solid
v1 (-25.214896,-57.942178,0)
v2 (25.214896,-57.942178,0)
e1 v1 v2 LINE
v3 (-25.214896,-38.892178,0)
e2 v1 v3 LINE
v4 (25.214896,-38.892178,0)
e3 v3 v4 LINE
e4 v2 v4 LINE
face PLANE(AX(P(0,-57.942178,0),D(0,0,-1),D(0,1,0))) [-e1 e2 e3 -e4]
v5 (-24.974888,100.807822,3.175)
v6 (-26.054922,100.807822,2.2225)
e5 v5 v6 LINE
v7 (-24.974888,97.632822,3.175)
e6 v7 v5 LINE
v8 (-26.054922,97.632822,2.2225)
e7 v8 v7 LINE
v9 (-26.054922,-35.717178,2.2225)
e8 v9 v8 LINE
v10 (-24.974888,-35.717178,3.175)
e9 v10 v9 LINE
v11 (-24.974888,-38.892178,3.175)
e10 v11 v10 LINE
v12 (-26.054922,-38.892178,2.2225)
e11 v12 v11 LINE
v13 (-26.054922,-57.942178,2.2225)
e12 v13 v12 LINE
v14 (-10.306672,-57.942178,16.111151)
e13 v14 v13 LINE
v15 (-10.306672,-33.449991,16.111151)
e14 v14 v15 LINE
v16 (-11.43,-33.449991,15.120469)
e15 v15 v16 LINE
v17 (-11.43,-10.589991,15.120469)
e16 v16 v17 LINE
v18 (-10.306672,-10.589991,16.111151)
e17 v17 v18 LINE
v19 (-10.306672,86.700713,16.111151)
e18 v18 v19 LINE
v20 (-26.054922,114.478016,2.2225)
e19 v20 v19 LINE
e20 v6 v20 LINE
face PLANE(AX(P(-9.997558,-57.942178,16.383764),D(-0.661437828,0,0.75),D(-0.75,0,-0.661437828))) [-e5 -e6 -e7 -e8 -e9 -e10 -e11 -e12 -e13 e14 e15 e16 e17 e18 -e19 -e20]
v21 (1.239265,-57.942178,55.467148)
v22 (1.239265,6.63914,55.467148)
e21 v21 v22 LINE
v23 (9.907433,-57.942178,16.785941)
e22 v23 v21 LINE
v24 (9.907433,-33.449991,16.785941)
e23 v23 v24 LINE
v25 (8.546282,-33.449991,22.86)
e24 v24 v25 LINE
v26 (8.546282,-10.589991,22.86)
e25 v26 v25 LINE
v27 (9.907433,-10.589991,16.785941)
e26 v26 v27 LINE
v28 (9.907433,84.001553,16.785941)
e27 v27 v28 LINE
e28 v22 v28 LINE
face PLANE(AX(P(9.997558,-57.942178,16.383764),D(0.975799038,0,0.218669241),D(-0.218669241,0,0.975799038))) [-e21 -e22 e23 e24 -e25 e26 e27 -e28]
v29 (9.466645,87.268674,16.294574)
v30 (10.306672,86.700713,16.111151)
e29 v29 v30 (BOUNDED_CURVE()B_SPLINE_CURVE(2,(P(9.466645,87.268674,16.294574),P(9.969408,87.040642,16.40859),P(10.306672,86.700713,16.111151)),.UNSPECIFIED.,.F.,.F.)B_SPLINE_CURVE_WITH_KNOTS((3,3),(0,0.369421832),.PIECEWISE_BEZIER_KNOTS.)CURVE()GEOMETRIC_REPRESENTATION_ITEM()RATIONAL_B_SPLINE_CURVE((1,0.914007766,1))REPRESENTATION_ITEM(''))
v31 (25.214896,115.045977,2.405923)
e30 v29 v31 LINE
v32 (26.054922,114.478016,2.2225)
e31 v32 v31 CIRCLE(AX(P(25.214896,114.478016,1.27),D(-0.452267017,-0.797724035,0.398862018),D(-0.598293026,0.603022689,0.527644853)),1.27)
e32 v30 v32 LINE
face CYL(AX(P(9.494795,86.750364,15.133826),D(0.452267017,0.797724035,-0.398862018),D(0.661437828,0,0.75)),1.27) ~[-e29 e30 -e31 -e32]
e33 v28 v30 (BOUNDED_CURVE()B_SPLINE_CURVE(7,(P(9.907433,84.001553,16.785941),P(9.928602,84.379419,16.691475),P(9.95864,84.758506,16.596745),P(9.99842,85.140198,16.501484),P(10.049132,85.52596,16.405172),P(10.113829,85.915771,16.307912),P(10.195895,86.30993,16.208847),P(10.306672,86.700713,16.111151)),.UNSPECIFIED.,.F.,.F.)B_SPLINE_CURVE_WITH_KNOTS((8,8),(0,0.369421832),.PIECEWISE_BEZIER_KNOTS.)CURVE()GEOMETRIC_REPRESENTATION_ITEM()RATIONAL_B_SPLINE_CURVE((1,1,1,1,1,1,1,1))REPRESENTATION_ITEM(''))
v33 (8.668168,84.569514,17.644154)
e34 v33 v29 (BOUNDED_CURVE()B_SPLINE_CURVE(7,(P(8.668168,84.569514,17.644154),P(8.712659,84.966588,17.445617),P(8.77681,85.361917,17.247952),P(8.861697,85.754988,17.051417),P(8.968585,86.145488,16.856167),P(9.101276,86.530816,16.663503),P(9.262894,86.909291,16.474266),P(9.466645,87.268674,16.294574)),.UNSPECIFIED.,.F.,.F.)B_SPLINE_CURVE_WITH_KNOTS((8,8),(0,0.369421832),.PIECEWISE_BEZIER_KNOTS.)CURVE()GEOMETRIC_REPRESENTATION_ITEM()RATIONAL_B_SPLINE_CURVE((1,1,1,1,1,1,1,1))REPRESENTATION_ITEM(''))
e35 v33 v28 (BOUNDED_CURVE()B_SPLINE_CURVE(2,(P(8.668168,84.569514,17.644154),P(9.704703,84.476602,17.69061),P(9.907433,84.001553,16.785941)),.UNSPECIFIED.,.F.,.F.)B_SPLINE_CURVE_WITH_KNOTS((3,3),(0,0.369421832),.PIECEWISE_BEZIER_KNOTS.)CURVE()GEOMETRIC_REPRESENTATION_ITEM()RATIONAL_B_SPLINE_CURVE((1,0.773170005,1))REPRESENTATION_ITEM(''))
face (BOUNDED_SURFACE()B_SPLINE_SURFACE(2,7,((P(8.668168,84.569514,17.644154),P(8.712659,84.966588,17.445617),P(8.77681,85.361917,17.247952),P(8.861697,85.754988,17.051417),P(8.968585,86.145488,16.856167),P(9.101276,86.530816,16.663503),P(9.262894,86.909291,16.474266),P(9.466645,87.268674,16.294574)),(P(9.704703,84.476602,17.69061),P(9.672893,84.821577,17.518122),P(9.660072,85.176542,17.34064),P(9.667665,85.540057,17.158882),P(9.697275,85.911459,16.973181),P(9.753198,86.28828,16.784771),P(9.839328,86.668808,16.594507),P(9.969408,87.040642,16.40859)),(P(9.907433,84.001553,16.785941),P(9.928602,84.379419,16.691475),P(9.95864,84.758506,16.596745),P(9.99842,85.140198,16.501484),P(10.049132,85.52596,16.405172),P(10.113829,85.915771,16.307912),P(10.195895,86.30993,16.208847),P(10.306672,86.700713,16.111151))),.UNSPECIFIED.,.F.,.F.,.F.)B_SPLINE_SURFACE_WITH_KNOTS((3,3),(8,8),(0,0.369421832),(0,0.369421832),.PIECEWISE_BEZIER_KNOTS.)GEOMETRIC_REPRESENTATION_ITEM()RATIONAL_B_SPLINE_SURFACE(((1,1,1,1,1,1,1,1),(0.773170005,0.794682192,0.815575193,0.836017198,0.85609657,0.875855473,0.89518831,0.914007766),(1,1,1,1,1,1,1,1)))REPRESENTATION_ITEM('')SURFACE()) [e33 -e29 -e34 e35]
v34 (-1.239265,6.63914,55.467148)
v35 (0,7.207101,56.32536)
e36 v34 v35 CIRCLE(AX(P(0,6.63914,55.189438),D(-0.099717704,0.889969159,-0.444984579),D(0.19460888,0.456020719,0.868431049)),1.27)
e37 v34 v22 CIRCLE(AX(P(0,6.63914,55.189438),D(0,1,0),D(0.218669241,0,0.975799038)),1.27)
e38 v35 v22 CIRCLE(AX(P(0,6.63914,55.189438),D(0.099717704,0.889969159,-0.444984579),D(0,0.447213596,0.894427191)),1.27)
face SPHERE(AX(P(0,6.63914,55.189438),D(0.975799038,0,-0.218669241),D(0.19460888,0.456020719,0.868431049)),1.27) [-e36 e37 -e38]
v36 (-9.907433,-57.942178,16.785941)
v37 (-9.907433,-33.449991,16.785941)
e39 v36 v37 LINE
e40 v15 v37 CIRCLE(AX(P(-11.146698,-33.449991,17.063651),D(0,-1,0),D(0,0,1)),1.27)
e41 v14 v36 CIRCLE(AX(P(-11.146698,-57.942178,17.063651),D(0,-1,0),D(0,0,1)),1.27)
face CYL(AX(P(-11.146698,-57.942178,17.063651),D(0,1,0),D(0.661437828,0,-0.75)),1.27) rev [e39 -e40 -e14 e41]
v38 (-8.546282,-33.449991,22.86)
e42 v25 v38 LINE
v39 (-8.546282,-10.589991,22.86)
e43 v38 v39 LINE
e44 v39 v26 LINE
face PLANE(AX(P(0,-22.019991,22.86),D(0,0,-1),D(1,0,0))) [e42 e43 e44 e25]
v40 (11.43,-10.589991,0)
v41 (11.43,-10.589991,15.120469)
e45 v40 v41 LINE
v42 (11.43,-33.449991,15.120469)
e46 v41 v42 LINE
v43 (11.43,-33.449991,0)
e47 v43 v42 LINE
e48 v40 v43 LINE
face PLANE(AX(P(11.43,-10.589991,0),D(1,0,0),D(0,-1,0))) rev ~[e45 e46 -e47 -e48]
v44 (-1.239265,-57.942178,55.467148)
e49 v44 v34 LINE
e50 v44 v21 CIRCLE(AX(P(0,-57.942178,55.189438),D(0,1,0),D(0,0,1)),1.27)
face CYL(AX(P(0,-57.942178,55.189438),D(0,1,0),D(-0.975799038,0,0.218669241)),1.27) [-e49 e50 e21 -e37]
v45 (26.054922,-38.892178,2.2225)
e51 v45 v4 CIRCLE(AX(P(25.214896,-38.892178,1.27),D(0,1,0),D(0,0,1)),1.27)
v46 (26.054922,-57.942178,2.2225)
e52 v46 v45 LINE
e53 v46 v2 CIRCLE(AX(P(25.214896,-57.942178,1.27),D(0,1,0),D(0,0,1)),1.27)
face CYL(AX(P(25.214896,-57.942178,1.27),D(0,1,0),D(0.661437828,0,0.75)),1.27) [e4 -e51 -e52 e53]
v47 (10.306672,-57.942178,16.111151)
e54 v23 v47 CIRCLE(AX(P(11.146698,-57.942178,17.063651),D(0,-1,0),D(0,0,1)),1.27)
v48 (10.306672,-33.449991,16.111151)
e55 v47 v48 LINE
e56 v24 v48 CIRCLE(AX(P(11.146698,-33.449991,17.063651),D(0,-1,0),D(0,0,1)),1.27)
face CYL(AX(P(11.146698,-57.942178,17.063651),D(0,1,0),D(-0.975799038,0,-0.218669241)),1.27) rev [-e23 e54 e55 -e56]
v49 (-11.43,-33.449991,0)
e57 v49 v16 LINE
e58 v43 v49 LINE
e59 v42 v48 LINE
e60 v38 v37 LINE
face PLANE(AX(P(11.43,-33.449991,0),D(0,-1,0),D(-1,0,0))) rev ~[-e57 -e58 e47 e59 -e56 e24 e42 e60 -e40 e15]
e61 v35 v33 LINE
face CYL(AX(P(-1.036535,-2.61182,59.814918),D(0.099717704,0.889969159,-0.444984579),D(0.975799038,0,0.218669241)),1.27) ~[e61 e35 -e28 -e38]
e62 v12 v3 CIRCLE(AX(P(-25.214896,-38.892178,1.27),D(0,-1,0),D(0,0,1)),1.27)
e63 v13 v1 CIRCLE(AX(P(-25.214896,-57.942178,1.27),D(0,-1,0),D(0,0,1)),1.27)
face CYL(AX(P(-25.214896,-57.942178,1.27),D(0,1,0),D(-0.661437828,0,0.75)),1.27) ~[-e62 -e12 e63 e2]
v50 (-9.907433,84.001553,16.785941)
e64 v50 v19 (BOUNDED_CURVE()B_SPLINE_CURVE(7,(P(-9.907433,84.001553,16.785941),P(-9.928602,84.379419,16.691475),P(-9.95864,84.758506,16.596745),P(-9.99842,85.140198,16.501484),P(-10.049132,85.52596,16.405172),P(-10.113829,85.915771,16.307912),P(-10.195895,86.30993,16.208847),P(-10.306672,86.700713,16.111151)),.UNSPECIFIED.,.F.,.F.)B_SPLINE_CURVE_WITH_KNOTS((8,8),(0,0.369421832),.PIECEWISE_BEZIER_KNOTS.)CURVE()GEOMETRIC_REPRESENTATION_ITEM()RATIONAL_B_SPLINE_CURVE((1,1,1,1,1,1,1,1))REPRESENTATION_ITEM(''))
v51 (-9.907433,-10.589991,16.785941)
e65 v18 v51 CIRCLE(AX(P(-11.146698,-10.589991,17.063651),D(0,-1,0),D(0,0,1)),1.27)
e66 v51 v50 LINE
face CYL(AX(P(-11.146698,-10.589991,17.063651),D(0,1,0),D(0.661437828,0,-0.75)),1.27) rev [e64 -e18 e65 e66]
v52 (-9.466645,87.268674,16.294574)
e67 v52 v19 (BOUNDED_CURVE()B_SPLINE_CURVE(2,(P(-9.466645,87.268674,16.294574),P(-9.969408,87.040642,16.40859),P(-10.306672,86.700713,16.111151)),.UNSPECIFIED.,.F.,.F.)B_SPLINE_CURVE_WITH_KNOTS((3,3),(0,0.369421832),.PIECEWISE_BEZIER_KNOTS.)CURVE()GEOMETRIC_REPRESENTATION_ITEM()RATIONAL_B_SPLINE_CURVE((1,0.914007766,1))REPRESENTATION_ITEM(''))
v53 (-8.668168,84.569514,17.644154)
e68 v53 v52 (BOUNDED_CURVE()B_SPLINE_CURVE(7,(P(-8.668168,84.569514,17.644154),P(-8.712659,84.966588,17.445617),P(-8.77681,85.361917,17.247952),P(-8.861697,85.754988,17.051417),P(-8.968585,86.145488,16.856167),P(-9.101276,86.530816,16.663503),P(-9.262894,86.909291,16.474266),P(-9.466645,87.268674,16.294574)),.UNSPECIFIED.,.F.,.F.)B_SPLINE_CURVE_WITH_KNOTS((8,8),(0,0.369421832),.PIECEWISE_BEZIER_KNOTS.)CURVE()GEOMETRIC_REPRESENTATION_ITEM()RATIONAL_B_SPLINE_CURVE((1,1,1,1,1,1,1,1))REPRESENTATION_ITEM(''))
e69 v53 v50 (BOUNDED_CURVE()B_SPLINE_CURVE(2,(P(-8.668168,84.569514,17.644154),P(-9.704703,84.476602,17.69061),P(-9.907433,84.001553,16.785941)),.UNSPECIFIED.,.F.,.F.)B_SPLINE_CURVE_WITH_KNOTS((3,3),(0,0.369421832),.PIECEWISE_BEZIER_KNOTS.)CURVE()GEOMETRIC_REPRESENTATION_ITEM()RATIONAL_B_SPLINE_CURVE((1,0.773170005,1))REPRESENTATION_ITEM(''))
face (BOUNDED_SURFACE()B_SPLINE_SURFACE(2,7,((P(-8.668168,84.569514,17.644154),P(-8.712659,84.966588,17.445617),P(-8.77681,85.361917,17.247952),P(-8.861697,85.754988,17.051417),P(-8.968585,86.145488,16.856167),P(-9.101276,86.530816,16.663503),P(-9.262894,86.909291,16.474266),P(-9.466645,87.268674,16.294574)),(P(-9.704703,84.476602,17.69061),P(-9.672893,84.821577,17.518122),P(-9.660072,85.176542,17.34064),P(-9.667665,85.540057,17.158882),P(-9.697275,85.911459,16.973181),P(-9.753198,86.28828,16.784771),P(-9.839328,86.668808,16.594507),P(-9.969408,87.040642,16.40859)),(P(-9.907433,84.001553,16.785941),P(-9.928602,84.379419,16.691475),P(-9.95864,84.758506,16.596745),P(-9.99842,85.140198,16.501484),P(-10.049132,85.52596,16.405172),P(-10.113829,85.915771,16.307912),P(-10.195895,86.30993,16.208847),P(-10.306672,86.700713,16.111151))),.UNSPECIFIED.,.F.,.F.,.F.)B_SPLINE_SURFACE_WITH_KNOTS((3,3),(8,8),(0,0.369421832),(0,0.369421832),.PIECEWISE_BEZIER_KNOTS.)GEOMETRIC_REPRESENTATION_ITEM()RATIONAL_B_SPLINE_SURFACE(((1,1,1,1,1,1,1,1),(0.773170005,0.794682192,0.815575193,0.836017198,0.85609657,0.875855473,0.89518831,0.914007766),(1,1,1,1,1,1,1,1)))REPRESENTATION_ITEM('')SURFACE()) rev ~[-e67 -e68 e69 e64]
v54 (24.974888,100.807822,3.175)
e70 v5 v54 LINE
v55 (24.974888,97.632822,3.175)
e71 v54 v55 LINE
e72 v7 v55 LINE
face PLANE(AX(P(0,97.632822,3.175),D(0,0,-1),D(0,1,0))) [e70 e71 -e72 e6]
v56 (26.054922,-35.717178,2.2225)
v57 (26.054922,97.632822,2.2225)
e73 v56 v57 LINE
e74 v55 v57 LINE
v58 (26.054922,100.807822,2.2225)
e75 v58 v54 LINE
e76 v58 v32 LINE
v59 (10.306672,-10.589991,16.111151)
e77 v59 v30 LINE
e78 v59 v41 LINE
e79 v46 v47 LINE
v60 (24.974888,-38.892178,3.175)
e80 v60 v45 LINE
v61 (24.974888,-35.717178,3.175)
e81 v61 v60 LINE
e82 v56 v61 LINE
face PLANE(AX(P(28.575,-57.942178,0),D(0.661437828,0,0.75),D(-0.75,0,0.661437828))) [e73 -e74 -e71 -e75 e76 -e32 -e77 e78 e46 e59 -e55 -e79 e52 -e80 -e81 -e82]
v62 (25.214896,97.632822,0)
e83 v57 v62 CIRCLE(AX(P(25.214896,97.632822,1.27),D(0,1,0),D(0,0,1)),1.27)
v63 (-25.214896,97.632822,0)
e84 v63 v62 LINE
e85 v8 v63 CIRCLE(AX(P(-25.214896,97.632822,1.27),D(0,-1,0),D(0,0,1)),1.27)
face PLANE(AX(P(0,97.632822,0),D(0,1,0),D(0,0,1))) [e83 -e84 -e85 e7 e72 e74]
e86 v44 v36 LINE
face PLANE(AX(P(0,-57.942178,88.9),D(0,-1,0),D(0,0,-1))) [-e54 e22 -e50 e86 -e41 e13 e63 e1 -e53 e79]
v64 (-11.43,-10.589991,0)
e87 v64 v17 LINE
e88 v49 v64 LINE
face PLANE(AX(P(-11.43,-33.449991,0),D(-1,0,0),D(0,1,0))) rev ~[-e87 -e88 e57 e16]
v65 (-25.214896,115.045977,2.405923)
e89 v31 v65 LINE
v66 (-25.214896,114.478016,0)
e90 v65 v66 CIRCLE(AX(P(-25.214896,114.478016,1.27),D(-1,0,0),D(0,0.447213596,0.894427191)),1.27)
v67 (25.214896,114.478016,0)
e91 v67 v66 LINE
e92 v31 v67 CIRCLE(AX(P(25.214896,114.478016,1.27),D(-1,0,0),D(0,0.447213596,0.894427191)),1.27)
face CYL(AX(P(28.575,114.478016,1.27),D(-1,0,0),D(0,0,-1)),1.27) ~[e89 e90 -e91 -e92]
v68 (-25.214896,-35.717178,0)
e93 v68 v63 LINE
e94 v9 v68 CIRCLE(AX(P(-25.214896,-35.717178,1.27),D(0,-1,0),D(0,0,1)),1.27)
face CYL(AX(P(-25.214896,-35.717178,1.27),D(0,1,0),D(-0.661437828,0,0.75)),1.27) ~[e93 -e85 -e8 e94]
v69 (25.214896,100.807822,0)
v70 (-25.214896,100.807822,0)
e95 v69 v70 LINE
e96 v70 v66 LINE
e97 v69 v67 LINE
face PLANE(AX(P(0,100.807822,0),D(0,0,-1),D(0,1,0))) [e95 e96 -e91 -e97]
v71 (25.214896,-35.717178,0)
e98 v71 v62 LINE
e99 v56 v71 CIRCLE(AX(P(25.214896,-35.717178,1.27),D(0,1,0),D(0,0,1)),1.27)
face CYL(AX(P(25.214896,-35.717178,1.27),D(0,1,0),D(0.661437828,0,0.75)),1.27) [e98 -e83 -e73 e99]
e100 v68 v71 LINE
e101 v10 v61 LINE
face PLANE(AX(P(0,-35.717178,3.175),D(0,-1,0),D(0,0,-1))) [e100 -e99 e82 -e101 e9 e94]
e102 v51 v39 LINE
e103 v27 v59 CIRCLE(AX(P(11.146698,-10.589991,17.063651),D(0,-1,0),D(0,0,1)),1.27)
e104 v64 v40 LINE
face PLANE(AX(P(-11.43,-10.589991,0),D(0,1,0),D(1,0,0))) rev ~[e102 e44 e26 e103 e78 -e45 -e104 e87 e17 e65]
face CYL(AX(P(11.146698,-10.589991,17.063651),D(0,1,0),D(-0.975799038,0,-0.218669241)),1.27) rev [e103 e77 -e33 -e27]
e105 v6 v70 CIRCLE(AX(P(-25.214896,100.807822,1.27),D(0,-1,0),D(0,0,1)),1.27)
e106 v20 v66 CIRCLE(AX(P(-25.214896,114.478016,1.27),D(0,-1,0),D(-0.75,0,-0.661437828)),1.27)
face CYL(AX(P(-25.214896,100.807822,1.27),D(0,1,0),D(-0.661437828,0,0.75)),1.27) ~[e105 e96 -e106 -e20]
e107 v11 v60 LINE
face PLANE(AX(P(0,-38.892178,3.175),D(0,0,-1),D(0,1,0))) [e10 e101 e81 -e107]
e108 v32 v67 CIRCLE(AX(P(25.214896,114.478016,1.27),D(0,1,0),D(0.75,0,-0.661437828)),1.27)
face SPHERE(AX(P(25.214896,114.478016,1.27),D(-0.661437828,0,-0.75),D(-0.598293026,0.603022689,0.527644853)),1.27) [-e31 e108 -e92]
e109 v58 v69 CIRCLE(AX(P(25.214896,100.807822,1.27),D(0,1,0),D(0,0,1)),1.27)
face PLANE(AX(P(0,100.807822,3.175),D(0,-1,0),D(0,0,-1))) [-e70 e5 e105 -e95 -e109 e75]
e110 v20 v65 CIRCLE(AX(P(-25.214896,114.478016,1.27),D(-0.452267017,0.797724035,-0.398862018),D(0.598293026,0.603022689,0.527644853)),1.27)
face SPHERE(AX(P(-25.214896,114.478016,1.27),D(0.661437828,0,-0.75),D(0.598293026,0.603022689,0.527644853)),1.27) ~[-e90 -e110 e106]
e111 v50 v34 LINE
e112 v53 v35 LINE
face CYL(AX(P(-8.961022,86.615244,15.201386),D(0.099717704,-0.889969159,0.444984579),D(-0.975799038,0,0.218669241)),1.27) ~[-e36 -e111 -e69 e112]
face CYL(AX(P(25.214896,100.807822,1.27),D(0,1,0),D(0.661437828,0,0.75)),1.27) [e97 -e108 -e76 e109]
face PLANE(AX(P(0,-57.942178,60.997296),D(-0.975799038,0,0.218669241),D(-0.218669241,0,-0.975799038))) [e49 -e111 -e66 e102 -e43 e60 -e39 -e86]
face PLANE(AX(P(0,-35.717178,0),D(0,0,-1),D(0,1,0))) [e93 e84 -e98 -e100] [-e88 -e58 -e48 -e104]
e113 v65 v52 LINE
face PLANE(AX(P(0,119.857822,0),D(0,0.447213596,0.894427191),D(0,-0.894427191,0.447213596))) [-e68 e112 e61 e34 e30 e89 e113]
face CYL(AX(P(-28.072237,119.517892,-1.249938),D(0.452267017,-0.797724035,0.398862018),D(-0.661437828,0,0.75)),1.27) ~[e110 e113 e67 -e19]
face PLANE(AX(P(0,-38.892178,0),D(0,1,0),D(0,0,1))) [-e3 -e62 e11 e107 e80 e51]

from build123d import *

# Parameters (mm, degrees)
F1_DEPTH = 28.575
F3_DEPTH = 22.86
F5_DEPTH = 177.8
F6_R     = 1.27


with BuildPart() as f1:
    # F0 (on Right) → F1 (new body, symmetric)
    with BuildSketch(Plane.YZ):
        Polygon((-57.9421781003, 88.9), (-57.9421781003, 0), (-38.8921781003, 0), (-38.8921781003, 3.175), (-35.7171781003, 3.175), (-35.7171781003, 0), (97.6328218997, 0), (97.6328218997, 3.175), (100.8078218997, 3.175), (100.8078218997, 0), (119.8578218997, 0), align=None)
    extrude(amount=F1_DEPTH, both=True)

    # F2 (on face) → F3 (cut)
    with BuildSketch(Plane(origin=(0, 0, 0), x_dir=(1, 0, 0), z_dir=(0, 0, -1))):
        Polygon((11.43, 33.4499907649), (0, 33.4499907649), (-11.43, 33.4499907649), (-11.43, 10.5899907649), (0, 10.5899907649), (11.43, 10.5899907649), align=None)
    extrude(amount=-F3_DEPTH, mode=Mode.SUBTRACT)

    # F4 (on face) → F5 (intersect)
    with BuildSketch(Plane.XZ.offset(57.9421781003)):
        Polygon((-9.9975576818, 16.3837641232), (-28.575, 0), (28.575, 0), (9.9975576818, 16.3837641232), (0, 60.9972961555), align=None)
    extrude(amount=-F5_DEPTH, mode=Mode.INTERSECT)

    # F6
    f6_edges = [f1.edges().sort_by_distance(p)[0] for p in [
        (0, 119.857822, 0),
        (4.998779, 42.476762, 38.69053),
        (-4.998779, 42.476762, 38.69053),
        (19.286279, 103.474058, 8.191882),
        (-19.286279, 103.474058, 8.191882),
        (0, -30.039474, 60.997296),
        (9.997558, 38.250151, 16.383764),
        (28.575, 30.957822, 0),
        (28.575, -48.417178, 0),
        (28.575, 110.332822, 0),
        (-28.575, 110.332822, 0),
        (-28.575, 30.957822, 0),
        (-28.575, -48.417178, 0),
        (-9.997558, 38.250151, 16.383764),
        (-9.997558, -45.696084, 16.383764),
        (9.997558, -45.696084, 16.383764),
    ]]
    fillet(f6_edges, radius=F6_R)


solid = f1.part
